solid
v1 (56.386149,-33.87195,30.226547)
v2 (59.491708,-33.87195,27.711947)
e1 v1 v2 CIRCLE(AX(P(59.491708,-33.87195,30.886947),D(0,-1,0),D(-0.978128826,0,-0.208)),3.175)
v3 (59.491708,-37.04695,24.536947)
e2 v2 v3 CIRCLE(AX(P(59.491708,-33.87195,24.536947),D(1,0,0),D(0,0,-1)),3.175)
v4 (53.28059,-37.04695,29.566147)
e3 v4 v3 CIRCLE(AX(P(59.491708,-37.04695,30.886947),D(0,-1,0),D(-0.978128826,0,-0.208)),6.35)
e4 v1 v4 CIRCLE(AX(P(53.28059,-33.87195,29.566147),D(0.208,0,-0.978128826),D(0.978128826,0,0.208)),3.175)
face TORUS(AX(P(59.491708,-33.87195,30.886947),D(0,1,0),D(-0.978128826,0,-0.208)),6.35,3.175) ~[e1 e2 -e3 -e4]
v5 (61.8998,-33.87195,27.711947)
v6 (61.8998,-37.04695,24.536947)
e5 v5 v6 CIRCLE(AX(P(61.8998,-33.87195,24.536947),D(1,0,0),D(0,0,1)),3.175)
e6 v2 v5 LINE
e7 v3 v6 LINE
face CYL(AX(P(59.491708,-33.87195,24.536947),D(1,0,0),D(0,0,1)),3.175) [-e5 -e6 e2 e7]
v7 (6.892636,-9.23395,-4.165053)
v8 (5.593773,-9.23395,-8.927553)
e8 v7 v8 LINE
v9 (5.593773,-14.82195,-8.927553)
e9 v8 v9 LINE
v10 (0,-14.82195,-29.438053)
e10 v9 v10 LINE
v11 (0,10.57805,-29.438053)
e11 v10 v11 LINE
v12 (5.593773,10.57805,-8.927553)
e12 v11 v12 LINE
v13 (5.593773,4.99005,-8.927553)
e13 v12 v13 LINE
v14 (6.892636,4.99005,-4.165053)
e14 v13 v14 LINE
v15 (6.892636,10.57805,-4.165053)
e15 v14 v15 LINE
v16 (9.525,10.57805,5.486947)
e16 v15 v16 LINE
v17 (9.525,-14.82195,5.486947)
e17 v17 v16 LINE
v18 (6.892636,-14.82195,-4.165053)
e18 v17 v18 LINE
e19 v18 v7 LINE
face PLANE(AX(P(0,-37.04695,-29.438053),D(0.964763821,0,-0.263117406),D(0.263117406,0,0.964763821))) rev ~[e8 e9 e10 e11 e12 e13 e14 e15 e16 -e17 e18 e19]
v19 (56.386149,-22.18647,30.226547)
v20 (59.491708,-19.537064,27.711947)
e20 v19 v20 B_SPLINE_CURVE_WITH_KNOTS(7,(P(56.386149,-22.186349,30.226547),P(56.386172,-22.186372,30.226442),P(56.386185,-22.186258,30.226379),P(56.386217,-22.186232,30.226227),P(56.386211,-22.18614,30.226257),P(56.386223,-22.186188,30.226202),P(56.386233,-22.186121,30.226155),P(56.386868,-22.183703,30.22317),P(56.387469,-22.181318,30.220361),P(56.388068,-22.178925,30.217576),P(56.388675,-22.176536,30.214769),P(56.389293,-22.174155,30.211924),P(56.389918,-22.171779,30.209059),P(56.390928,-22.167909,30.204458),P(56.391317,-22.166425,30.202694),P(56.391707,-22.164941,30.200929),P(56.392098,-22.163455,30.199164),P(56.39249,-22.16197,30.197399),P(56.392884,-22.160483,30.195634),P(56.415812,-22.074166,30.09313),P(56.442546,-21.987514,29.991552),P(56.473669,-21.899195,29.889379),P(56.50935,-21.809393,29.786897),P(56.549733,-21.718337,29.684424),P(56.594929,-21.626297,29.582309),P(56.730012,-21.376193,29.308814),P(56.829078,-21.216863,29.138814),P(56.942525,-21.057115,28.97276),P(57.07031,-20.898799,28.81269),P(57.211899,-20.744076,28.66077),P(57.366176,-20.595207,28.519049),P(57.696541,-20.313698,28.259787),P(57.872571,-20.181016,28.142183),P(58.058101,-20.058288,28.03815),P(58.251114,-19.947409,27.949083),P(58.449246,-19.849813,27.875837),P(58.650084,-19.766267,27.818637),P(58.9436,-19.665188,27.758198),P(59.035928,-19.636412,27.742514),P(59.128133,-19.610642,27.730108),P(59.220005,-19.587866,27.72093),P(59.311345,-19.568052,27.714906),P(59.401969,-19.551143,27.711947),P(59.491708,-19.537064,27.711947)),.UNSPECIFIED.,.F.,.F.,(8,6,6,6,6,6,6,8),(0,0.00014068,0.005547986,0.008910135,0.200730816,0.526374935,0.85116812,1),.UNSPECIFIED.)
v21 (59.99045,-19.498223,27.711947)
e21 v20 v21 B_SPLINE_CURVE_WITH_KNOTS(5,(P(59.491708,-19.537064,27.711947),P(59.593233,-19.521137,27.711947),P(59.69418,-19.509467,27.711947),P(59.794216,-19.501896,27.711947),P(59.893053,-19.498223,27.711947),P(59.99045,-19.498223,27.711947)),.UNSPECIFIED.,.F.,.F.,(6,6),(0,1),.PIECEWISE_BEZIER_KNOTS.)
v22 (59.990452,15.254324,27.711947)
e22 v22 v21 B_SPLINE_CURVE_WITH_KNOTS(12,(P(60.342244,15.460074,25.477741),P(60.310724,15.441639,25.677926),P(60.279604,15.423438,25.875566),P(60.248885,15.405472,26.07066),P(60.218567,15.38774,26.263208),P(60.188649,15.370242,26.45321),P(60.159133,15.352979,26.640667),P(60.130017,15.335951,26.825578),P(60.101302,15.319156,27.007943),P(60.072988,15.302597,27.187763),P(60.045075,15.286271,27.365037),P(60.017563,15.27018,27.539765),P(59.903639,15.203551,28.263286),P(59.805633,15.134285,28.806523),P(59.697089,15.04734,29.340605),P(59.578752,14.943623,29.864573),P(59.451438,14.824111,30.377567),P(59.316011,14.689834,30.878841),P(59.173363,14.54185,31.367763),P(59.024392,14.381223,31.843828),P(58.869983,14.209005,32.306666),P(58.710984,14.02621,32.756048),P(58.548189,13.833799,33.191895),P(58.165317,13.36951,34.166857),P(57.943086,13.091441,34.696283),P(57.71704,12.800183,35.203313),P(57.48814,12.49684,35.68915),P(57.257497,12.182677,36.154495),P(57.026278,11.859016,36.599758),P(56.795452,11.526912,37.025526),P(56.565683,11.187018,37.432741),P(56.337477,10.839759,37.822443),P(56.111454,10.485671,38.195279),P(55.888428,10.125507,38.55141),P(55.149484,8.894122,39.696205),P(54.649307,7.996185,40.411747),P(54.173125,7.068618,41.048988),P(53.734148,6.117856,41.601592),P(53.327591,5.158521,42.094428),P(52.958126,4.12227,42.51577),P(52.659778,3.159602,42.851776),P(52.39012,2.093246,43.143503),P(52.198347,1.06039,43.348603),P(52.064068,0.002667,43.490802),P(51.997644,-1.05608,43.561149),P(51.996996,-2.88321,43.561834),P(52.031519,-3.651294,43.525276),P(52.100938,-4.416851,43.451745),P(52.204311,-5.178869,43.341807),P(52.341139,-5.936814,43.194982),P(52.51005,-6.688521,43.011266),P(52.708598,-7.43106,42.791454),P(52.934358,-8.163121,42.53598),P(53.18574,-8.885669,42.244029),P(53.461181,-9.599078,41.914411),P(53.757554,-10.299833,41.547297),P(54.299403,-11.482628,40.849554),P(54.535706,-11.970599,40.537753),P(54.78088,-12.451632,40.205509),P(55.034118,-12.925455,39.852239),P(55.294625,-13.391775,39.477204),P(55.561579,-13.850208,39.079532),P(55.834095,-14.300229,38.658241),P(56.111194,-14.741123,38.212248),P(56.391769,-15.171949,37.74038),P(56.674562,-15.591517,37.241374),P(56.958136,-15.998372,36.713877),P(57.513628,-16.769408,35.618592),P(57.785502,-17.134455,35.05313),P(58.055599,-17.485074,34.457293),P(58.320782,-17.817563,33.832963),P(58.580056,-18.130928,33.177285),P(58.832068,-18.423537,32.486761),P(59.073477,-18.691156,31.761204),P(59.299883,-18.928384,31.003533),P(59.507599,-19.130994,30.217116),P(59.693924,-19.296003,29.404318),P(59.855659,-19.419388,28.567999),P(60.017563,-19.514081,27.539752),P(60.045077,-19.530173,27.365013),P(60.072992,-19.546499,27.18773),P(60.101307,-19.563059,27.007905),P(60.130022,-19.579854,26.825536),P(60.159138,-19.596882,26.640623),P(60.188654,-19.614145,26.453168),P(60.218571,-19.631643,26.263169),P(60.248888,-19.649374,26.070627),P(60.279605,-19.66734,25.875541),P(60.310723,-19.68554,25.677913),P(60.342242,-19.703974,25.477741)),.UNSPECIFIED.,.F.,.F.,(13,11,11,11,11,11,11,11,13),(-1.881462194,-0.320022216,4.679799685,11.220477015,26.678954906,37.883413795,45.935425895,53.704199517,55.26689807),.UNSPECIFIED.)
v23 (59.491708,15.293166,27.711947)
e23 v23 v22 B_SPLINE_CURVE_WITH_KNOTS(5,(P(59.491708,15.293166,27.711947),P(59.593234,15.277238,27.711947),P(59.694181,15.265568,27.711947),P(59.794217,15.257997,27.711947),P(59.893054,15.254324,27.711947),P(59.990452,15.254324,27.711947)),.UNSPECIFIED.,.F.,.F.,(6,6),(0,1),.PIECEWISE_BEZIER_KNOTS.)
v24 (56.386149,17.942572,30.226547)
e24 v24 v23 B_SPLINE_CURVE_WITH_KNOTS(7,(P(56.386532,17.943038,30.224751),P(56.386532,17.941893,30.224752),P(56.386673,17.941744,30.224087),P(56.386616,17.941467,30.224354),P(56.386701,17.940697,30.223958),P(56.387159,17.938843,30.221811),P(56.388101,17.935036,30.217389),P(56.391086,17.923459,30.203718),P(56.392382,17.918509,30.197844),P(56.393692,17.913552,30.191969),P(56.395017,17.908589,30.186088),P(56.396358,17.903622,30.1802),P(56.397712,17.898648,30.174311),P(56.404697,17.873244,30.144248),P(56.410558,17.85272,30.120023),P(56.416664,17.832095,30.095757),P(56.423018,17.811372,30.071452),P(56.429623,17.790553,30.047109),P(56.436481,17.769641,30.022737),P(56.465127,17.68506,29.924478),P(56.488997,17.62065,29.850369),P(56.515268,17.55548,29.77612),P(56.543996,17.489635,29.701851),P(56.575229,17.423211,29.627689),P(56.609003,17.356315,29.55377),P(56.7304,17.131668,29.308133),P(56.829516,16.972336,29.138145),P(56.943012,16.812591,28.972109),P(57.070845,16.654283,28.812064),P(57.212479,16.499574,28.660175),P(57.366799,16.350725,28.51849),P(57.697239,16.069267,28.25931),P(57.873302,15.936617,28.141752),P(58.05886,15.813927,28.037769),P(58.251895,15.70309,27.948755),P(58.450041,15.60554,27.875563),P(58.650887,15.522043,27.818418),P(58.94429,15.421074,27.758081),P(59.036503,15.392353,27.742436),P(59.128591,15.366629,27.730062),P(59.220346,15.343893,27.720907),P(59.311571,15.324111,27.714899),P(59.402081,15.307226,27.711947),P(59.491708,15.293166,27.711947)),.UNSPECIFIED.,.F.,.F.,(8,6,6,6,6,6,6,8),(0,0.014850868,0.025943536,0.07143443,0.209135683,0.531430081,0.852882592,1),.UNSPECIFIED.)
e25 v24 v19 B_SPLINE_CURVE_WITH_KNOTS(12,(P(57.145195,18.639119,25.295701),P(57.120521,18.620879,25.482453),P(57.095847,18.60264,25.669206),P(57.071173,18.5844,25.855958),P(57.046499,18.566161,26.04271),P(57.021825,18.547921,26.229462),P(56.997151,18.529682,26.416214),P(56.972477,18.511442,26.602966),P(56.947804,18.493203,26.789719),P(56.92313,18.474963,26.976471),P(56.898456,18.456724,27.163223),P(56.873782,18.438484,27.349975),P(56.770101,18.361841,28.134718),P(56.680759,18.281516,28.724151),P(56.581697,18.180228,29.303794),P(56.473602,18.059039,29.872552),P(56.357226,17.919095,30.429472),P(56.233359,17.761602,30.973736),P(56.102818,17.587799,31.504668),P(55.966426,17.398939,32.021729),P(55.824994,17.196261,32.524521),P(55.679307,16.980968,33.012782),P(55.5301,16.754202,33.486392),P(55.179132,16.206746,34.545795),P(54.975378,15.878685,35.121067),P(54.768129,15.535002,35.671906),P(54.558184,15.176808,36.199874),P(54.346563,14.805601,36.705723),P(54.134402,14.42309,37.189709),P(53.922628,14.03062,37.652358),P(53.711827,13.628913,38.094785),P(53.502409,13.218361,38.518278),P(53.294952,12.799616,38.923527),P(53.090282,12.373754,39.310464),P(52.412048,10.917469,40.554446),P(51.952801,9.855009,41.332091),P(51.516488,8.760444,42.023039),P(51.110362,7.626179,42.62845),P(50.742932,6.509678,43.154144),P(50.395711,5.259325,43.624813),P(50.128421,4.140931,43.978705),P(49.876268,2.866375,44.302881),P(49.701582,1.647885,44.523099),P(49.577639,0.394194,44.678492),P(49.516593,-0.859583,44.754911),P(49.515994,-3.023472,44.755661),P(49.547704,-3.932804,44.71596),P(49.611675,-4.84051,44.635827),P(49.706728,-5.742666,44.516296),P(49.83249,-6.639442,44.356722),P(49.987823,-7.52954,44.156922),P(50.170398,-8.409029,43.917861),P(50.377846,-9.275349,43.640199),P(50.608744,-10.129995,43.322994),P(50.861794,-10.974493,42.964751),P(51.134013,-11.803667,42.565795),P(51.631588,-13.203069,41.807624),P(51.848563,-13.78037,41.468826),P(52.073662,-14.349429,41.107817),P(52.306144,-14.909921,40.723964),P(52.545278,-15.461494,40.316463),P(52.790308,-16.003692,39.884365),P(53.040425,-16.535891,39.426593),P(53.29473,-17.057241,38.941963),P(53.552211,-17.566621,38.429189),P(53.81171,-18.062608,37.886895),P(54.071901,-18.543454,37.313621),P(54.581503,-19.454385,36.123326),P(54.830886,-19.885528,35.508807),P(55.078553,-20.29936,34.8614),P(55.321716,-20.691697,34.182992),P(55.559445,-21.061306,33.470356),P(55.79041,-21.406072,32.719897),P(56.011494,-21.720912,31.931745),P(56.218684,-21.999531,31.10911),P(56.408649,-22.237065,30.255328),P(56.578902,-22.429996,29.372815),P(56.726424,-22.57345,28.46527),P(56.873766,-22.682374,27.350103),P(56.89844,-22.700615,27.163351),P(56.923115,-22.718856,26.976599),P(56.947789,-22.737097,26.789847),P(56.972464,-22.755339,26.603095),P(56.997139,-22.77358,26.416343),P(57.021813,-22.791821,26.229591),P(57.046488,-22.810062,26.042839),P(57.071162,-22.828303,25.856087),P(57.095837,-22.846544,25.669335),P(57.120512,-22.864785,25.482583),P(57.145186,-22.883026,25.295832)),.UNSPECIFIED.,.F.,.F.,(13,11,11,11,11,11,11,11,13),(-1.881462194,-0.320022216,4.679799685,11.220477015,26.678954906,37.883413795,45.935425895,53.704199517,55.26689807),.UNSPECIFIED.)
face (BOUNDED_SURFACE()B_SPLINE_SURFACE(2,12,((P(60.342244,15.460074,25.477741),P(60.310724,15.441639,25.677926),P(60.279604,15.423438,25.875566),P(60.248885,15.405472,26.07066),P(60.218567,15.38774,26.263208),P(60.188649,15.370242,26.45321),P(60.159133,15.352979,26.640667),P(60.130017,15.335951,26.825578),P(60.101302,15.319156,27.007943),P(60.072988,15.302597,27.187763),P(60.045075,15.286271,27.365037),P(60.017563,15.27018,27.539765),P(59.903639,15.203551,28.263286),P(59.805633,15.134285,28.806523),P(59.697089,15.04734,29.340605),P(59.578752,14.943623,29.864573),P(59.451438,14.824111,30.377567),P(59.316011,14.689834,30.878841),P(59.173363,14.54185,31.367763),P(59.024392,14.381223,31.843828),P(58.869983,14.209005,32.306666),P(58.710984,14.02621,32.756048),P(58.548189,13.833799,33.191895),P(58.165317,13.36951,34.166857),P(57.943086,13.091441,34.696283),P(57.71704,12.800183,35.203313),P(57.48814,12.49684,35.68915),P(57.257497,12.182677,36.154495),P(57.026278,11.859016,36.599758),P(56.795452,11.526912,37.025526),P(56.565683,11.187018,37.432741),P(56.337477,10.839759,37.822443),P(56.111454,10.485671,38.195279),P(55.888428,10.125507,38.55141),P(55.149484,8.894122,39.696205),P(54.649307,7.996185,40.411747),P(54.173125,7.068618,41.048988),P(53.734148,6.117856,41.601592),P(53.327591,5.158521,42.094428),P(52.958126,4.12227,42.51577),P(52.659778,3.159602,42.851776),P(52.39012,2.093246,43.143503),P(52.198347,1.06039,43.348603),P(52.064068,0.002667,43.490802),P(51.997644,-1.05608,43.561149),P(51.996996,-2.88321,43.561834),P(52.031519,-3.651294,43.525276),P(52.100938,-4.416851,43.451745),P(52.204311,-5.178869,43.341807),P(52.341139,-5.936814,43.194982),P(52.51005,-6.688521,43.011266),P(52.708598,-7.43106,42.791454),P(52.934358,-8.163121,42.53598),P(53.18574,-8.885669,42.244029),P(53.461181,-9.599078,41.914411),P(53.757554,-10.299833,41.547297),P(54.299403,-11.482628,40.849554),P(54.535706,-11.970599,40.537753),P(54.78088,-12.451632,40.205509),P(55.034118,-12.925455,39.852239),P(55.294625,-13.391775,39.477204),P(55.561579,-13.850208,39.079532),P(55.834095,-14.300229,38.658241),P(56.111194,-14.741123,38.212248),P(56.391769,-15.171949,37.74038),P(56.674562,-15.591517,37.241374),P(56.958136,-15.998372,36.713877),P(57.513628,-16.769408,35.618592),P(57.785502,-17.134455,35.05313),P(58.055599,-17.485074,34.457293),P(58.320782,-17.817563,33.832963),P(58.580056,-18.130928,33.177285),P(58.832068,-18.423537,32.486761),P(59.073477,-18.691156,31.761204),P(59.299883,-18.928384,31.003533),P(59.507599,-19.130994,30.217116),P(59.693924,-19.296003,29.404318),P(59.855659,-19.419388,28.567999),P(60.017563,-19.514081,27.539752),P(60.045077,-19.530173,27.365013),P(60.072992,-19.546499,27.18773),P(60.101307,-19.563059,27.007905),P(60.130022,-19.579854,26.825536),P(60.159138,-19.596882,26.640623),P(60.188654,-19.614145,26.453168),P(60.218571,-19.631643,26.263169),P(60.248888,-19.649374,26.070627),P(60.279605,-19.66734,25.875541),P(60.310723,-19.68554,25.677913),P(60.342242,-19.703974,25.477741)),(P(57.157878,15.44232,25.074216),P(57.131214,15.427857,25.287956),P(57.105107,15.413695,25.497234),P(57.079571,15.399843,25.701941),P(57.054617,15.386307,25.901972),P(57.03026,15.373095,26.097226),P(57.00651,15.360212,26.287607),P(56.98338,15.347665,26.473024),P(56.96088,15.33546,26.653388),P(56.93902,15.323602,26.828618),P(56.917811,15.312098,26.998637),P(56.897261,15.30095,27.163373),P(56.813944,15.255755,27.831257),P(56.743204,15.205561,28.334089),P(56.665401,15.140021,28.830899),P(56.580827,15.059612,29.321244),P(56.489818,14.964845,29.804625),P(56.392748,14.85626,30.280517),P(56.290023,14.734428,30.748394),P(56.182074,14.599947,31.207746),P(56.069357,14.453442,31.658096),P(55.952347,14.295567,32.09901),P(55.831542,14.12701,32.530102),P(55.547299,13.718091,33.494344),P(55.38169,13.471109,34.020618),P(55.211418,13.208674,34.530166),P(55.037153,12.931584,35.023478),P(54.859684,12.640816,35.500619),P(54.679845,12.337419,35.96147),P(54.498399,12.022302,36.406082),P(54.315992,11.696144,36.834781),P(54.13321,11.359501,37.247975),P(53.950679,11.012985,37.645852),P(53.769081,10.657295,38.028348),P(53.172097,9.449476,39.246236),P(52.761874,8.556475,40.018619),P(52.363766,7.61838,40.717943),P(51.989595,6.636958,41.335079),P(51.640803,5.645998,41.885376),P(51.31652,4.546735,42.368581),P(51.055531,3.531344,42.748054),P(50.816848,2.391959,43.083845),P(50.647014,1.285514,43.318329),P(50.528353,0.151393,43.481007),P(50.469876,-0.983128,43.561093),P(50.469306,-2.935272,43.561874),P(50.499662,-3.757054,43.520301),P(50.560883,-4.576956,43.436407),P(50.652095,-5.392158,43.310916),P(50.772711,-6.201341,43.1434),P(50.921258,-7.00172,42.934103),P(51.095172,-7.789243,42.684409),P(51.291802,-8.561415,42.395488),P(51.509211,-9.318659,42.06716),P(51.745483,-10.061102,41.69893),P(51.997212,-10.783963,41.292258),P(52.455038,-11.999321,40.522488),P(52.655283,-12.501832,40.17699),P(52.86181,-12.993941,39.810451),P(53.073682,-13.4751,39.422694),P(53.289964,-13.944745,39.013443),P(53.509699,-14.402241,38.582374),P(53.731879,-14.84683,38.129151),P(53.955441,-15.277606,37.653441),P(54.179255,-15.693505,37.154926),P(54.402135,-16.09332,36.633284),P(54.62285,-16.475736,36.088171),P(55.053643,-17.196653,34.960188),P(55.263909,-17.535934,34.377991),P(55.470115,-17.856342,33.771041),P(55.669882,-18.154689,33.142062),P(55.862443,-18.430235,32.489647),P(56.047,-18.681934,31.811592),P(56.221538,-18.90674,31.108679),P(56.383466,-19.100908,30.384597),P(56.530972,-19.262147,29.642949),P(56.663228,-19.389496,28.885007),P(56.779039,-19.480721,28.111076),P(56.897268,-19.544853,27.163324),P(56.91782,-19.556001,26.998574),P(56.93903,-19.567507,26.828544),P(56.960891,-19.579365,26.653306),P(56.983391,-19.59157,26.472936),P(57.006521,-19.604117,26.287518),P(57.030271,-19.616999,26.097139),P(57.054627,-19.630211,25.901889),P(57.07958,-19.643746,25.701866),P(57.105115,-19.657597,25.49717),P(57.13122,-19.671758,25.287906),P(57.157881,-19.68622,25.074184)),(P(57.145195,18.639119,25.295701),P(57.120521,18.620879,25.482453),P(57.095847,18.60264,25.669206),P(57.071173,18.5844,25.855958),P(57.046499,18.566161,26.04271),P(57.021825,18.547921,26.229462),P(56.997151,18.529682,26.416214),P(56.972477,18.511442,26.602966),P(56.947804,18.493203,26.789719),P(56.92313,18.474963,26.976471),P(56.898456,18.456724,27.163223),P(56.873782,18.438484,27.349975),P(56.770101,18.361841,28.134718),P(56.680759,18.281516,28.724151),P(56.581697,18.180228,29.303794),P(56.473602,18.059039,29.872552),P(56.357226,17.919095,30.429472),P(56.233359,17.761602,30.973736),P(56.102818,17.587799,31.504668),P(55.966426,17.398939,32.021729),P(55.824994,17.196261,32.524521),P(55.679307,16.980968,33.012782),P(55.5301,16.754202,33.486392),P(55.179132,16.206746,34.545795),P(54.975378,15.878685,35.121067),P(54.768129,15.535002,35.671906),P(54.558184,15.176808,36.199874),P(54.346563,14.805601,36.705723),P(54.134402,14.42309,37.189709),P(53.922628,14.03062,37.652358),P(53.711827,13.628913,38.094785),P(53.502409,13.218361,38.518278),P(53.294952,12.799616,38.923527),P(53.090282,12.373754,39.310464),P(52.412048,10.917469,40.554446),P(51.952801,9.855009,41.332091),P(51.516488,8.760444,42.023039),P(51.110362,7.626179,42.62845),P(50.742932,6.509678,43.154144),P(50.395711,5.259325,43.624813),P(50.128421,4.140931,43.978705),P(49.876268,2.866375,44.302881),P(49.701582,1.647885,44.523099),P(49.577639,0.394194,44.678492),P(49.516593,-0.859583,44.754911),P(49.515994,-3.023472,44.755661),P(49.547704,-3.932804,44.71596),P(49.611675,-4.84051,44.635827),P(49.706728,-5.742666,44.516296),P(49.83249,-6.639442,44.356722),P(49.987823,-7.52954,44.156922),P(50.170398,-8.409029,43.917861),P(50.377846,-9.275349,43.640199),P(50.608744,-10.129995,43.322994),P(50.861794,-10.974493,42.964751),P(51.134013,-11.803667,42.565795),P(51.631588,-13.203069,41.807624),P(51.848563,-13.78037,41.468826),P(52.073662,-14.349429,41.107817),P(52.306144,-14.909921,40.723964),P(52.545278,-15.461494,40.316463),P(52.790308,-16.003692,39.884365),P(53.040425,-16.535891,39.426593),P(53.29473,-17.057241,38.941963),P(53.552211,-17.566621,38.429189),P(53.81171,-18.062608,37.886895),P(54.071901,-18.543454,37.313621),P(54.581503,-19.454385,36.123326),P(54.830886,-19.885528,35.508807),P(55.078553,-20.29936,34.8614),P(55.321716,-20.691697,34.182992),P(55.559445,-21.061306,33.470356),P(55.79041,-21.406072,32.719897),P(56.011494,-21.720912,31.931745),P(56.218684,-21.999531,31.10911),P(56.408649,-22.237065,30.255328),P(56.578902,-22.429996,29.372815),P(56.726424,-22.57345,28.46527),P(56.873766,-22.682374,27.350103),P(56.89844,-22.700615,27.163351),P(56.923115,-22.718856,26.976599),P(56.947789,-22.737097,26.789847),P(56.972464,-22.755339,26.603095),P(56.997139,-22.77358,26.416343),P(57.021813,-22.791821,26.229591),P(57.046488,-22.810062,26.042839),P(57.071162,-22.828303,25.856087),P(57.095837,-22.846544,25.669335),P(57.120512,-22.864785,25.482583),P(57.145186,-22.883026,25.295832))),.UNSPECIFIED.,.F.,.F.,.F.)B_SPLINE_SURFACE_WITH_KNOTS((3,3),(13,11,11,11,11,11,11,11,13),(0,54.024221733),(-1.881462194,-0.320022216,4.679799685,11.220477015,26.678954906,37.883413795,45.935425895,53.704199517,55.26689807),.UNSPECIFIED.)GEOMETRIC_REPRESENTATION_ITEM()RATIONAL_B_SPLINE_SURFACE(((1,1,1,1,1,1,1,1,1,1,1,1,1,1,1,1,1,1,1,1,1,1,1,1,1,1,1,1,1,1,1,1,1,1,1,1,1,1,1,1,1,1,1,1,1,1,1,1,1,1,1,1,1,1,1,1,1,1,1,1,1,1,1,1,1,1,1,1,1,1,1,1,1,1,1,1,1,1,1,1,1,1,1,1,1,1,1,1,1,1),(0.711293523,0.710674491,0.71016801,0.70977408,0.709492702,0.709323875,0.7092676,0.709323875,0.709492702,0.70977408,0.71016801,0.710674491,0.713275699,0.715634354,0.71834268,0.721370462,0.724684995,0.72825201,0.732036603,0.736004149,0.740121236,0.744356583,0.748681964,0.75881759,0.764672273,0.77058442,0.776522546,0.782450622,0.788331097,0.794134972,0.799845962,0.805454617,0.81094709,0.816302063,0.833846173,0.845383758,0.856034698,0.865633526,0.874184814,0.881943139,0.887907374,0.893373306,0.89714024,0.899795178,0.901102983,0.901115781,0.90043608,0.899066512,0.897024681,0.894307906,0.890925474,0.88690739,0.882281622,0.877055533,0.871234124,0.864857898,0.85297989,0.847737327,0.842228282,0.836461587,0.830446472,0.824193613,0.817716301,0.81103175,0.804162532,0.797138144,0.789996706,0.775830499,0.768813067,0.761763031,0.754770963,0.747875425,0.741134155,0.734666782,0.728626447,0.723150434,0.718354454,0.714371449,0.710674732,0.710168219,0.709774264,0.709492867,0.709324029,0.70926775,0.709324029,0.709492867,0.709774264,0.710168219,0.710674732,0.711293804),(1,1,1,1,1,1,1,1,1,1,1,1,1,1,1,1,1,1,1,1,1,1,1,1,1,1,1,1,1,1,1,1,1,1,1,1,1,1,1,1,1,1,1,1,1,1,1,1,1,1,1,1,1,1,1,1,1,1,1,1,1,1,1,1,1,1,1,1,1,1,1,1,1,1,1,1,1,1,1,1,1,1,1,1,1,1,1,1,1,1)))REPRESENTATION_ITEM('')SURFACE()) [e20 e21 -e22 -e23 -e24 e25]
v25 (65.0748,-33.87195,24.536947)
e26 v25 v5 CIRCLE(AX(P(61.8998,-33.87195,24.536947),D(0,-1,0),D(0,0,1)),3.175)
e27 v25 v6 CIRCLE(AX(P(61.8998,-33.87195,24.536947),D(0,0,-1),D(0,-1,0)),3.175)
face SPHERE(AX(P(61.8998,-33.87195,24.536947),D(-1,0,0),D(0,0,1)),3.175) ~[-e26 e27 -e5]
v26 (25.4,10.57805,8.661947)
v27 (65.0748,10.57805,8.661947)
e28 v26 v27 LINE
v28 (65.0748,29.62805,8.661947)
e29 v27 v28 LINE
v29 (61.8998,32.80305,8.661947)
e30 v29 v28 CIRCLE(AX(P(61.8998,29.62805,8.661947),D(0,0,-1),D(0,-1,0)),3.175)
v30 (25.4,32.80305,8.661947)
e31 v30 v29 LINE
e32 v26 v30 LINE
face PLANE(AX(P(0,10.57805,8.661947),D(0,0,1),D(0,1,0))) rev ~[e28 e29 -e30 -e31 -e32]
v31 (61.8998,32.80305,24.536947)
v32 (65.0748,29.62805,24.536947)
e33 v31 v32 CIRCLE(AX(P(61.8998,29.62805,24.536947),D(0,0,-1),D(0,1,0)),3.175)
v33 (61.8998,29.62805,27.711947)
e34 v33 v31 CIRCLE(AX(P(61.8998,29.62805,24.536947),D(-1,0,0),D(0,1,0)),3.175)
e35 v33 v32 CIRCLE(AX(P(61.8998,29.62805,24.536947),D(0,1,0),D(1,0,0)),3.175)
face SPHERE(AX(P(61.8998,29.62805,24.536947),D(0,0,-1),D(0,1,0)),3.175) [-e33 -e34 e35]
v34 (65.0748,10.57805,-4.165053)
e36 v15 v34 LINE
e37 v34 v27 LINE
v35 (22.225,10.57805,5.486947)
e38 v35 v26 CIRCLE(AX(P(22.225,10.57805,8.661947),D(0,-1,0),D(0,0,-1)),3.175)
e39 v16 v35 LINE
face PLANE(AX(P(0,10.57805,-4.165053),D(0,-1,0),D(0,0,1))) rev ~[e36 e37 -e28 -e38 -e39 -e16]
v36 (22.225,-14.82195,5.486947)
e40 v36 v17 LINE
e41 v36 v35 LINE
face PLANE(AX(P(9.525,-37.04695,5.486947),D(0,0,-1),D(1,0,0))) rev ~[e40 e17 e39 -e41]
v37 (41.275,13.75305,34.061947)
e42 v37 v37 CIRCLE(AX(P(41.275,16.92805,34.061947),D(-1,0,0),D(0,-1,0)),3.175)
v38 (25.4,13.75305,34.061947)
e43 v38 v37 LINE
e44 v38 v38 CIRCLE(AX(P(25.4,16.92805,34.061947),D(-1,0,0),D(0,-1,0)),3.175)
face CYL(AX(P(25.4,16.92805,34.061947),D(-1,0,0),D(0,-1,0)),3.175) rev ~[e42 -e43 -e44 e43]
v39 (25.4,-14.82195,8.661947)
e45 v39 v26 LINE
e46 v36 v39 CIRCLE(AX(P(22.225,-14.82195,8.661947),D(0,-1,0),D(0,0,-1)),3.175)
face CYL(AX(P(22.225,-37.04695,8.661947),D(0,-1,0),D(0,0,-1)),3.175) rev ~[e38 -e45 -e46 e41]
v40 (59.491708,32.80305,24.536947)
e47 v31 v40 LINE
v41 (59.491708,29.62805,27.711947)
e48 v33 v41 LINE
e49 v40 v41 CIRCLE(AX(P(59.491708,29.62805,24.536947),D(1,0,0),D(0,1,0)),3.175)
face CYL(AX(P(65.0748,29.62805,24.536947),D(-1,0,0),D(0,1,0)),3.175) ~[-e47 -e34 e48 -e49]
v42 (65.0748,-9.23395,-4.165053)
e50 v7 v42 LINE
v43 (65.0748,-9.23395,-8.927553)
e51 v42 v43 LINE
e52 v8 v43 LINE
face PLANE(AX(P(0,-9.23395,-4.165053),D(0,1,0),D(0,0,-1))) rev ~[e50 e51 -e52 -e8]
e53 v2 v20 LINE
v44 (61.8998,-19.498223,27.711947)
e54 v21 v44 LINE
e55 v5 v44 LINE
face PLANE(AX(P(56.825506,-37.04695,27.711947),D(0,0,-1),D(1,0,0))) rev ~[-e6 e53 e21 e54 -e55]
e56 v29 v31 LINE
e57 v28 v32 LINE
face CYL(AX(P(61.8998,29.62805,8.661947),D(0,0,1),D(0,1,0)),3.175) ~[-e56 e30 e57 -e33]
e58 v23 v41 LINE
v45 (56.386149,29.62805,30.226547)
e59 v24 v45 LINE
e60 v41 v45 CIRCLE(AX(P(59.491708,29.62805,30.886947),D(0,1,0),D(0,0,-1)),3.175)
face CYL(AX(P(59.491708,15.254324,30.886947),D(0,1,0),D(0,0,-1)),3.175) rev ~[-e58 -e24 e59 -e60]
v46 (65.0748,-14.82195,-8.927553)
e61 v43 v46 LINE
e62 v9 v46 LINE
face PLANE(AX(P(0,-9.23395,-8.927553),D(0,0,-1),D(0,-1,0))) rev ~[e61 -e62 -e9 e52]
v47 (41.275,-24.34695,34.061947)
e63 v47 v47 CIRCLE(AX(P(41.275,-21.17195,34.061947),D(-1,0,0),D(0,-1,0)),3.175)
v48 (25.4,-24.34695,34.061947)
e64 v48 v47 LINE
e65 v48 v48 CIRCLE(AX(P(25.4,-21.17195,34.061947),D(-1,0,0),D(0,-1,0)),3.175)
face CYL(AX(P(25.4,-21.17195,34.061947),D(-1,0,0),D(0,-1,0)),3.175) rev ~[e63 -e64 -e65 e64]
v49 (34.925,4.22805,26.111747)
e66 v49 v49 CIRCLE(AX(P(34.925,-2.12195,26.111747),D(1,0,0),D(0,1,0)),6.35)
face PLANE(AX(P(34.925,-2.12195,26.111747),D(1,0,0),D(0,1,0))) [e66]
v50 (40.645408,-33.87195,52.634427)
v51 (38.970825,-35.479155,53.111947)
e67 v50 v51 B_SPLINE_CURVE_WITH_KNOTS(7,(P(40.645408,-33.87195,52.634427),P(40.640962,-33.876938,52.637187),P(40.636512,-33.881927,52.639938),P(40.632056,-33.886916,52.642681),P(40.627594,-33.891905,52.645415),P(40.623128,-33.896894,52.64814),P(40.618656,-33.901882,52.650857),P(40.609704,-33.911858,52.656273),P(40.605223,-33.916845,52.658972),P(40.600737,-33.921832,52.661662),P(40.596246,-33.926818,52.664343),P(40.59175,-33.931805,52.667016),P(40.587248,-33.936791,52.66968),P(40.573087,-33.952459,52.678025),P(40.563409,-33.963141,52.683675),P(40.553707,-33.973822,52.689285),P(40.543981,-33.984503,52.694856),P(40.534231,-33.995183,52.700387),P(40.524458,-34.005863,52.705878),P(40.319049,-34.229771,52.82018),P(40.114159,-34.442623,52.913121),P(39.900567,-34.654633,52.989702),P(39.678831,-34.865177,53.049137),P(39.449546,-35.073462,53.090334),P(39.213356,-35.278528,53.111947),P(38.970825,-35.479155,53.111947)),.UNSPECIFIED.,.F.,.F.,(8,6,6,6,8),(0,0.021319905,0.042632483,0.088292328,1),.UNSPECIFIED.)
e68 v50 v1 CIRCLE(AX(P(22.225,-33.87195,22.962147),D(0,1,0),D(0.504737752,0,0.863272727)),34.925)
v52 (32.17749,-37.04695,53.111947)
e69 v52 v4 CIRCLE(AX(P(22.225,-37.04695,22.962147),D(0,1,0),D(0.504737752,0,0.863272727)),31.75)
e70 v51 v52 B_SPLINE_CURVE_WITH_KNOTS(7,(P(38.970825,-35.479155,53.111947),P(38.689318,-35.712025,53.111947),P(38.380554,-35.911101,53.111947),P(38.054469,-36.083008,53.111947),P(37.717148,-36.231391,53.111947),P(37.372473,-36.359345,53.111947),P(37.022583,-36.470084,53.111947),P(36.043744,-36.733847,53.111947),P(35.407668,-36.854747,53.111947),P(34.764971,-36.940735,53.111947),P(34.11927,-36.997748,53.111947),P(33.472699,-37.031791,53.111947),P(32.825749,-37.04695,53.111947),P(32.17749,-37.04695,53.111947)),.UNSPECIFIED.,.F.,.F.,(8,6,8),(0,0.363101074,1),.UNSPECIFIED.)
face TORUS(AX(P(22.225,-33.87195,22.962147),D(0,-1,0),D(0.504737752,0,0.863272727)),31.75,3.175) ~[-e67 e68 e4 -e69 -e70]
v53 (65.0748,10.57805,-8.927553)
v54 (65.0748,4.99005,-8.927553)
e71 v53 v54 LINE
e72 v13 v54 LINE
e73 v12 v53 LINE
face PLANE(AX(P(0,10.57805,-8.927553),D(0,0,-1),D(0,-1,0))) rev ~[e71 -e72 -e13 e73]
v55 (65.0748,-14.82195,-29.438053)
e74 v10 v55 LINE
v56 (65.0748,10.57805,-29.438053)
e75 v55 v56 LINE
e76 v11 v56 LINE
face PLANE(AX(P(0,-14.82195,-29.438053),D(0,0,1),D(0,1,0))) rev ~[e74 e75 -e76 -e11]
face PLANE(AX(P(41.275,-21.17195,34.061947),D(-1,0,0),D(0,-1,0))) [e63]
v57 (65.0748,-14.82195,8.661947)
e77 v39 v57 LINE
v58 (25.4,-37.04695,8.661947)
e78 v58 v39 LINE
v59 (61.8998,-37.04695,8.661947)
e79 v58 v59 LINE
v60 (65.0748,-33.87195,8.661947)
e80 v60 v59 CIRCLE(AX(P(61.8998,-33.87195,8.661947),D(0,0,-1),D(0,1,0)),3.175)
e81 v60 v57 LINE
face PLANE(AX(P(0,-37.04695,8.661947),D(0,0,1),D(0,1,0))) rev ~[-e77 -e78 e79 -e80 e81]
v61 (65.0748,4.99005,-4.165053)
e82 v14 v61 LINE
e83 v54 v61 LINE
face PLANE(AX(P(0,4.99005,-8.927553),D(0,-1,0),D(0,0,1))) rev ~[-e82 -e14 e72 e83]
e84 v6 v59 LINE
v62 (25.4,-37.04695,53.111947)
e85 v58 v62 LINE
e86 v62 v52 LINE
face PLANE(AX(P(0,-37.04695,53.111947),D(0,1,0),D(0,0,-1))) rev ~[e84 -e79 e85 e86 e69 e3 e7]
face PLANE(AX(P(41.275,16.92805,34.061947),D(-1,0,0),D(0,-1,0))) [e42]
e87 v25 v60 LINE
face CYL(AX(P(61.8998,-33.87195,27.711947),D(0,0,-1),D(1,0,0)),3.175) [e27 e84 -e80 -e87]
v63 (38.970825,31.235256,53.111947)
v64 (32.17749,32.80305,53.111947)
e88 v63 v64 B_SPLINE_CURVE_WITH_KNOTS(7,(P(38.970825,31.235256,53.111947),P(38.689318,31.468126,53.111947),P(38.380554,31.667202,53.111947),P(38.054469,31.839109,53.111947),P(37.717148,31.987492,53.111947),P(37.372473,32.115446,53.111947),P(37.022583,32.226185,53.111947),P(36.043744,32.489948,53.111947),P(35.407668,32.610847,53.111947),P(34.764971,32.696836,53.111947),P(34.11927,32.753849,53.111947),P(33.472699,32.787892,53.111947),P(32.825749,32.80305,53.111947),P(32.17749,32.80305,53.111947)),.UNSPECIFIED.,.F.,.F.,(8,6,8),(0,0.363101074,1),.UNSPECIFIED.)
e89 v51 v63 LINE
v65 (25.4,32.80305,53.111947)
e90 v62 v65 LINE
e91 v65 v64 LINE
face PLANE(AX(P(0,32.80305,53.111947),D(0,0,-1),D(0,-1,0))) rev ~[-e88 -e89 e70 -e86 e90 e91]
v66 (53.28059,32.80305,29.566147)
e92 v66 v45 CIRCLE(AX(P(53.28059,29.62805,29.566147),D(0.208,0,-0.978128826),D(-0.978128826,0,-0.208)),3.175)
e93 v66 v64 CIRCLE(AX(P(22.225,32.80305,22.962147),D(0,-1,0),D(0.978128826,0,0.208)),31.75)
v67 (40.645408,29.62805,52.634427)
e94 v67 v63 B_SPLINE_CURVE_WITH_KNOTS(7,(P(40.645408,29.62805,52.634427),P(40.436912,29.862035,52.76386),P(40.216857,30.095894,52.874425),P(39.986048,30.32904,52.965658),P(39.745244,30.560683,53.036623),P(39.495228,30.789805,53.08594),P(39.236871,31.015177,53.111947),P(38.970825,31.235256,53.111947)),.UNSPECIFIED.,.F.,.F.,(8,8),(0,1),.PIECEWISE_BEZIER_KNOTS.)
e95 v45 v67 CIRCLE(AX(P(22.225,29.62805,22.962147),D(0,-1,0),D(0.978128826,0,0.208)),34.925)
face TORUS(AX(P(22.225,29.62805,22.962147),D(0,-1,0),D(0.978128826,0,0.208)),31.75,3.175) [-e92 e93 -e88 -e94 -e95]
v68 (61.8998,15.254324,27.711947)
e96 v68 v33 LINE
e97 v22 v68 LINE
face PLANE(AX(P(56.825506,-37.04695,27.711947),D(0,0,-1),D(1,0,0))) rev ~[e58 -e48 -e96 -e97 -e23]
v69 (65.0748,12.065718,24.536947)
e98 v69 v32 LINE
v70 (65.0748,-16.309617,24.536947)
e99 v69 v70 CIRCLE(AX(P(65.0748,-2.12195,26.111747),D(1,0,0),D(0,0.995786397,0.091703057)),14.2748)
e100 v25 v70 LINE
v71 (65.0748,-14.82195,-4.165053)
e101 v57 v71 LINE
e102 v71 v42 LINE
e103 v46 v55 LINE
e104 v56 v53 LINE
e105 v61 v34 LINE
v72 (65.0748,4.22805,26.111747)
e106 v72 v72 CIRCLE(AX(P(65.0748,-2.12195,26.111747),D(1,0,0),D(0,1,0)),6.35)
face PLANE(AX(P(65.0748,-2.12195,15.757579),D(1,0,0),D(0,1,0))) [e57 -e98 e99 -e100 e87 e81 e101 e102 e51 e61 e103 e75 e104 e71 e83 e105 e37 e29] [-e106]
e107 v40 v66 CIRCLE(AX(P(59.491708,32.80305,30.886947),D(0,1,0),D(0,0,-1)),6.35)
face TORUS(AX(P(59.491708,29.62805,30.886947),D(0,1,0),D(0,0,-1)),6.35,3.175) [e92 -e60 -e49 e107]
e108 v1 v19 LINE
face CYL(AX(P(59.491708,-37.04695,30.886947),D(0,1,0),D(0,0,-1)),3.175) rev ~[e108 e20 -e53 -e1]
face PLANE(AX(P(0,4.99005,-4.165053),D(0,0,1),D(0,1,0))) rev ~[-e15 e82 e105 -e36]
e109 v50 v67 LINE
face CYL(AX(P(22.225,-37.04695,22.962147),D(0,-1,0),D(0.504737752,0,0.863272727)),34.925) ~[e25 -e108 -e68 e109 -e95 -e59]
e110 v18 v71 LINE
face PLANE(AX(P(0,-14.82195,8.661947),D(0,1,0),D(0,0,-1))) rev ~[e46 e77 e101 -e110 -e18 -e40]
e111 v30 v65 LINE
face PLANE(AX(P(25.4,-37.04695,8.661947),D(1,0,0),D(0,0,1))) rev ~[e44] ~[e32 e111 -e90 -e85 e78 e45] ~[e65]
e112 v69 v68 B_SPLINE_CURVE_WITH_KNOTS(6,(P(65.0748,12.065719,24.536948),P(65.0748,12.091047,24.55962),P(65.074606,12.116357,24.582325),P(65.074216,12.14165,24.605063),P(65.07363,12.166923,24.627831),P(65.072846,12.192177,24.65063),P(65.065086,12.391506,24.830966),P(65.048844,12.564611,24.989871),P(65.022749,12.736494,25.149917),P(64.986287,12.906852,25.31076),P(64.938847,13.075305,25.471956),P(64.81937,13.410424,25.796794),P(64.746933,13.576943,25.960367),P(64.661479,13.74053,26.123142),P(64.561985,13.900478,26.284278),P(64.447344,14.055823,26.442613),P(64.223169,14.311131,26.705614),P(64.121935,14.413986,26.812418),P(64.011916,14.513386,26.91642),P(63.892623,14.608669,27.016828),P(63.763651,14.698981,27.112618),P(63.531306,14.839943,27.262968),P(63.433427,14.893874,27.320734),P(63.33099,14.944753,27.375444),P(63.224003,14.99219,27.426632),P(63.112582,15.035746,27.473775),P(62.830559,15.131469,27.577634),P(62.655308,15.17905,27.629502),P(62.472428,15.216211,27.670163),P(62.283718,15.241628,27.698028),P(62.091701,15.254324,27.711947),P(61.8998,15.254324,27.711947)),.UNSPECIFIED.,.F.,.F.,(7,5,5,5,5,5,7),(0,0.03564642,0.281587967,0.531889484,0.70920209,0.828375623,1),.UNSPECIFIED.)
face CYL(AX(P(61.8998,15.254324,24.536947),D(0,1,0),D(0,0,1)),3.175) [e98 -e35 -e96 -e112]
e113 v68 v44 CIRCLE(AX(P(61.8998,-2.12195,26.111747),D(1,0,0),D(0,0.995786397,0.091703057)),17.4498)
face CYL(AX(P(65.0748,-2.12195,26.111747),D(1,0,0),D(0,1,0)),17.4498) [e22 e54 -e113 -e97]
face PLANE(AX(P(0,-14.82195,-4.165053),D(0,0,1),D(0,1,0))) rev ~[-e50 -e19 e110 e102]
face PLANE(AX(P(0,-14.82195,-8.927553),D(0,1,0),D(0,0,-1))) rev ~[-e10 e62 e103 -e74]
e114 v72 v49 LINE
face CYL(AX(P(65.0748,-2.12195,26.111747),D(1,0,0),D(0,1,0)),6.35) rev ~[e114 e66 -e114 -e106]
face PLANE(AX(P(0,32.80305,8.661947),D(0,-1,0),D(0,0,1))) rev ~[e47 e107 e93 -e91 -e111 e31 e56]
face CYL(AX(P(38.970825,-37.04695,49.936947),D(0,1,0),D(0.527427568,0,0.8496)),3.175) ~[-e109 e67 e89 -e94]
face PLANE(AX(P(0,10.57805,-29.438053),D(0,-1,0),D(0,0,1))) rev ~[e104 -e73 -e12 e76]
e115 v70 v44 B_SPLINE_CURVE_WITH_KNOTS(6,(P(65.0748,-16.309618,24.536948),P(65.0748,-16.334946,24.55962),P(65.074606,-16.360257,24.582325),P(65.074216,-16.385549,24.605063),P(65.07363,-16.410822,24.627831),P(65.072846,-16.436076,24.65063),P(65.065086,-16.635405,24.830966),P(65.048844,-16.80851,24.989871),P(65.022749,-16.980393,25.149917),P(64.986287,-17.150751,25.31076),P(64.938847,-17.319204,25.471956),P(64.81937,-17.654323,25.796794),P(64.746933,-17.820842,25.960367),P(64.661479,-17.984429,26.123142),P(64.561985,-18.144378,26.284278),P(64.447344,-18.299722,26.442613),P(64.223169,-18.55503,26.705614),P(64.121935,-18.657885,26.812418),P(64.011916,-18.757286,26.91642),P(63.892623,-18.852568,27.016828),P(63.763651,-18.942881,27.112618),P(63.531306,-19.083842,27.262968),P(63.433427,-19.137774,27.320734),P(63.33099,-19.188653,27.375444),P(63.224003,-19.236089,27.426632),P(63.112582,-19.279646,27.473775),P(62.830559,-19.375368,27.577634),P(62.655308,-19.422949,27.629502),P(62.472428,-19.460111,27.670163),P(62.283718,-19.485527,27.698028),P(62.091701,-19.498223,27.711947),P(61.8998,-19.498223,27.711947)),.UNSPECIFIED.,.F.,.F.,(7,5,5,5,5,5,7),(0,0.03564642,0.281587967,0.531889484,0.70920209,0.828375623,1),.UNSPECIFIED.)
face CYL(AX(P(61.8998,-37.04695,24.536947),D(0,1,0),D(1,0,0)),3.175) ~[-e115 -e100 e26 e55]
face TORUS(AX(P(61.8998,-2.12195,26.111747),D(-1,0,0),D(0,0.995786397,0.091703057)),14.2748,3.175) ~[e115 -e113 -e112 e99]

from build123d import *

# Parameters (mm, degrees)
F1_DEPTH = 65.0748
F3_DEPTH = 69.851
F4_R     = 17.4498
F5_DEPTH = 25.4
F6_R     = 6.35
F7_DEPTH = 30.1498
F8_R     = 3.175
F9_DEPTH = 15.875
F10_F1_R = 3.175
F10_F2_R = 3.175


with BuildPart() as f1:
    # F0 (on Right) → F1 (new body)
    with BuildSketch(Plane.YZ):
        Polygon((32.8030504316, 53.1119473694), (-37.0469495684, 53.1119473694), (-37.0469495684, 8.6619473694), (-14.8219495684, 8.6619473694), (-14.8219495684, -4.1650526306), (-9.2339495684, -4.1650526306), (-9.2339495684, -8.9275526306), (-14.8219495684, -8.9275526306), (-14.8219495684, -29.4380526306), (10.5780504316, -29.4380526306), (10.5780504316, -8.9275526306), (4.9900504316, -8.9275526306), (4.9900504316, -4.1650526306), (10.5780504316, -4.1650526306), (10.5780504316, 8.6619473694), (32.8030504316, 8.6619473694), align=None)
    extrude(amount=F1_DEPTH)

    # F2 (on face) → F3 (cut, through all)
    with BuildSketch(Plane.XZ.offset(37.0469495684)):
        with BuildLine():
            ThreePointArc((22.225, 5.4869473694), (24.4700640303, 6.4168833391), (25.4, 8.6619473694))
            Line((25.4, 8.6619473694), (0, 8.6619473694))
            Line((0, 8.6619473694), (0, -29.4380526306))
            Line((0, -29.4380526306), (9.525, 5.4869473694))
            Line((9.525, 5.4869473694), (22.225, 5.4869473694))
        make_face()
        Polygon((25.4, 27.7119473694), (25.4, 53.1119473694), (0, 53.1119473694), (0, 8.6619473694), (25.4, 8.6619473694), align=None)
        with BuildLine():
            Line((65.0748, 53.1119473694), (39.8529659904, 53.1119473694))
            ThreePointArc((39.8529659904, 53.1119473694), (51.2636522621, 42.3660722249), (56.8255061373, 27.7119473694))
            Line((56.8255061373, 27.7119473694), (65.0748, 27.7119473694))
            Line((65.0748, 27.7119473694), (65.0748, 53.1119473694))
        make_face()
    extrude(amount=-F3_DEPTH, mode=Mode.SUBTRACT)

    # F4 (on face) → F5 (join)
    with BuildSketch(Plane.YZ.offset(65.0748)):
        with Locations((-2.1219495684, 26.1117473694)):
            Circle(F4_R)
    extrude(amount=-F5_DEPTH)

    # F6 (on face) → F7 (cut)
    with BuildSketch(Plane.YZ.offset(65.0748)):
        with Locations((-2.1219495684, 26.1117473694)):
            Circle(F6_R)
    extrude(amount=-F7_DEPTH, mode=Mode.SUBTRACT)

    # F8 (on face) → F9 (cut)
    with BuildSketch(Plane(origin=(25.4, 0, 0), x_dir=(0, -1, 0), z_dir=(-1, 0, 0))):
        with Locations((-16.9280504316, 34.0619473694)):
            Circle(F8_R)
        with Locations((21.1719495684, 34.0619473694)):
            Circle(F8_R)
    extrude(amount=-F9_DEPTH, mode=Mode.SUBTRACT)

    # F10: fillet of radius 3.175 on 12 edges, made by hand

    # F10_f1
    f10_f1_edges = [f1.edges().sort_by_distance(p)[0] for p in [
        (50.428197841, -2.1264417395, 43.5615467912),
        (56.8255061373, -28.2725863076, 27.7119473694),
        (56.8255061373, 24.0286871709, 27.7119473694),
    ]]
    fillet(f10_f1_edges, radius=F10_F1_R)

    # F10_f2
    f10_f2_edges = [f1.edges().sort_by_distance(p)[0] for p in [
        (50.5351306509, -37.0469495684, 43.4143386342),
        (62.2832541328, -37.0469495684, 27.7119473694),
        (65.0748, 32.8030504316, 18.1869473694),
        (50.5351306509, 32.8030504316, 43.4143386342),
        (39.8529659904, -2.1219495684, 53.1119473694),
        (65.0748, -28.2725863076, 27.7119473694),
        (65.0748, -2.1219495684, 43.5615473694),
        (65.0748, 24.0286871709, 27.7119473694),
        (65.0748, -37.0469495684, 18.1869473694),
        (57.4937274099, 32.8030504316, 28.4194187475),
        (57.4937274099, -37.0469495684, 28.4194187475),
    ]]
    fillet(f10_f2_edges, radius=F10_F2_R)


solid = f1.part
